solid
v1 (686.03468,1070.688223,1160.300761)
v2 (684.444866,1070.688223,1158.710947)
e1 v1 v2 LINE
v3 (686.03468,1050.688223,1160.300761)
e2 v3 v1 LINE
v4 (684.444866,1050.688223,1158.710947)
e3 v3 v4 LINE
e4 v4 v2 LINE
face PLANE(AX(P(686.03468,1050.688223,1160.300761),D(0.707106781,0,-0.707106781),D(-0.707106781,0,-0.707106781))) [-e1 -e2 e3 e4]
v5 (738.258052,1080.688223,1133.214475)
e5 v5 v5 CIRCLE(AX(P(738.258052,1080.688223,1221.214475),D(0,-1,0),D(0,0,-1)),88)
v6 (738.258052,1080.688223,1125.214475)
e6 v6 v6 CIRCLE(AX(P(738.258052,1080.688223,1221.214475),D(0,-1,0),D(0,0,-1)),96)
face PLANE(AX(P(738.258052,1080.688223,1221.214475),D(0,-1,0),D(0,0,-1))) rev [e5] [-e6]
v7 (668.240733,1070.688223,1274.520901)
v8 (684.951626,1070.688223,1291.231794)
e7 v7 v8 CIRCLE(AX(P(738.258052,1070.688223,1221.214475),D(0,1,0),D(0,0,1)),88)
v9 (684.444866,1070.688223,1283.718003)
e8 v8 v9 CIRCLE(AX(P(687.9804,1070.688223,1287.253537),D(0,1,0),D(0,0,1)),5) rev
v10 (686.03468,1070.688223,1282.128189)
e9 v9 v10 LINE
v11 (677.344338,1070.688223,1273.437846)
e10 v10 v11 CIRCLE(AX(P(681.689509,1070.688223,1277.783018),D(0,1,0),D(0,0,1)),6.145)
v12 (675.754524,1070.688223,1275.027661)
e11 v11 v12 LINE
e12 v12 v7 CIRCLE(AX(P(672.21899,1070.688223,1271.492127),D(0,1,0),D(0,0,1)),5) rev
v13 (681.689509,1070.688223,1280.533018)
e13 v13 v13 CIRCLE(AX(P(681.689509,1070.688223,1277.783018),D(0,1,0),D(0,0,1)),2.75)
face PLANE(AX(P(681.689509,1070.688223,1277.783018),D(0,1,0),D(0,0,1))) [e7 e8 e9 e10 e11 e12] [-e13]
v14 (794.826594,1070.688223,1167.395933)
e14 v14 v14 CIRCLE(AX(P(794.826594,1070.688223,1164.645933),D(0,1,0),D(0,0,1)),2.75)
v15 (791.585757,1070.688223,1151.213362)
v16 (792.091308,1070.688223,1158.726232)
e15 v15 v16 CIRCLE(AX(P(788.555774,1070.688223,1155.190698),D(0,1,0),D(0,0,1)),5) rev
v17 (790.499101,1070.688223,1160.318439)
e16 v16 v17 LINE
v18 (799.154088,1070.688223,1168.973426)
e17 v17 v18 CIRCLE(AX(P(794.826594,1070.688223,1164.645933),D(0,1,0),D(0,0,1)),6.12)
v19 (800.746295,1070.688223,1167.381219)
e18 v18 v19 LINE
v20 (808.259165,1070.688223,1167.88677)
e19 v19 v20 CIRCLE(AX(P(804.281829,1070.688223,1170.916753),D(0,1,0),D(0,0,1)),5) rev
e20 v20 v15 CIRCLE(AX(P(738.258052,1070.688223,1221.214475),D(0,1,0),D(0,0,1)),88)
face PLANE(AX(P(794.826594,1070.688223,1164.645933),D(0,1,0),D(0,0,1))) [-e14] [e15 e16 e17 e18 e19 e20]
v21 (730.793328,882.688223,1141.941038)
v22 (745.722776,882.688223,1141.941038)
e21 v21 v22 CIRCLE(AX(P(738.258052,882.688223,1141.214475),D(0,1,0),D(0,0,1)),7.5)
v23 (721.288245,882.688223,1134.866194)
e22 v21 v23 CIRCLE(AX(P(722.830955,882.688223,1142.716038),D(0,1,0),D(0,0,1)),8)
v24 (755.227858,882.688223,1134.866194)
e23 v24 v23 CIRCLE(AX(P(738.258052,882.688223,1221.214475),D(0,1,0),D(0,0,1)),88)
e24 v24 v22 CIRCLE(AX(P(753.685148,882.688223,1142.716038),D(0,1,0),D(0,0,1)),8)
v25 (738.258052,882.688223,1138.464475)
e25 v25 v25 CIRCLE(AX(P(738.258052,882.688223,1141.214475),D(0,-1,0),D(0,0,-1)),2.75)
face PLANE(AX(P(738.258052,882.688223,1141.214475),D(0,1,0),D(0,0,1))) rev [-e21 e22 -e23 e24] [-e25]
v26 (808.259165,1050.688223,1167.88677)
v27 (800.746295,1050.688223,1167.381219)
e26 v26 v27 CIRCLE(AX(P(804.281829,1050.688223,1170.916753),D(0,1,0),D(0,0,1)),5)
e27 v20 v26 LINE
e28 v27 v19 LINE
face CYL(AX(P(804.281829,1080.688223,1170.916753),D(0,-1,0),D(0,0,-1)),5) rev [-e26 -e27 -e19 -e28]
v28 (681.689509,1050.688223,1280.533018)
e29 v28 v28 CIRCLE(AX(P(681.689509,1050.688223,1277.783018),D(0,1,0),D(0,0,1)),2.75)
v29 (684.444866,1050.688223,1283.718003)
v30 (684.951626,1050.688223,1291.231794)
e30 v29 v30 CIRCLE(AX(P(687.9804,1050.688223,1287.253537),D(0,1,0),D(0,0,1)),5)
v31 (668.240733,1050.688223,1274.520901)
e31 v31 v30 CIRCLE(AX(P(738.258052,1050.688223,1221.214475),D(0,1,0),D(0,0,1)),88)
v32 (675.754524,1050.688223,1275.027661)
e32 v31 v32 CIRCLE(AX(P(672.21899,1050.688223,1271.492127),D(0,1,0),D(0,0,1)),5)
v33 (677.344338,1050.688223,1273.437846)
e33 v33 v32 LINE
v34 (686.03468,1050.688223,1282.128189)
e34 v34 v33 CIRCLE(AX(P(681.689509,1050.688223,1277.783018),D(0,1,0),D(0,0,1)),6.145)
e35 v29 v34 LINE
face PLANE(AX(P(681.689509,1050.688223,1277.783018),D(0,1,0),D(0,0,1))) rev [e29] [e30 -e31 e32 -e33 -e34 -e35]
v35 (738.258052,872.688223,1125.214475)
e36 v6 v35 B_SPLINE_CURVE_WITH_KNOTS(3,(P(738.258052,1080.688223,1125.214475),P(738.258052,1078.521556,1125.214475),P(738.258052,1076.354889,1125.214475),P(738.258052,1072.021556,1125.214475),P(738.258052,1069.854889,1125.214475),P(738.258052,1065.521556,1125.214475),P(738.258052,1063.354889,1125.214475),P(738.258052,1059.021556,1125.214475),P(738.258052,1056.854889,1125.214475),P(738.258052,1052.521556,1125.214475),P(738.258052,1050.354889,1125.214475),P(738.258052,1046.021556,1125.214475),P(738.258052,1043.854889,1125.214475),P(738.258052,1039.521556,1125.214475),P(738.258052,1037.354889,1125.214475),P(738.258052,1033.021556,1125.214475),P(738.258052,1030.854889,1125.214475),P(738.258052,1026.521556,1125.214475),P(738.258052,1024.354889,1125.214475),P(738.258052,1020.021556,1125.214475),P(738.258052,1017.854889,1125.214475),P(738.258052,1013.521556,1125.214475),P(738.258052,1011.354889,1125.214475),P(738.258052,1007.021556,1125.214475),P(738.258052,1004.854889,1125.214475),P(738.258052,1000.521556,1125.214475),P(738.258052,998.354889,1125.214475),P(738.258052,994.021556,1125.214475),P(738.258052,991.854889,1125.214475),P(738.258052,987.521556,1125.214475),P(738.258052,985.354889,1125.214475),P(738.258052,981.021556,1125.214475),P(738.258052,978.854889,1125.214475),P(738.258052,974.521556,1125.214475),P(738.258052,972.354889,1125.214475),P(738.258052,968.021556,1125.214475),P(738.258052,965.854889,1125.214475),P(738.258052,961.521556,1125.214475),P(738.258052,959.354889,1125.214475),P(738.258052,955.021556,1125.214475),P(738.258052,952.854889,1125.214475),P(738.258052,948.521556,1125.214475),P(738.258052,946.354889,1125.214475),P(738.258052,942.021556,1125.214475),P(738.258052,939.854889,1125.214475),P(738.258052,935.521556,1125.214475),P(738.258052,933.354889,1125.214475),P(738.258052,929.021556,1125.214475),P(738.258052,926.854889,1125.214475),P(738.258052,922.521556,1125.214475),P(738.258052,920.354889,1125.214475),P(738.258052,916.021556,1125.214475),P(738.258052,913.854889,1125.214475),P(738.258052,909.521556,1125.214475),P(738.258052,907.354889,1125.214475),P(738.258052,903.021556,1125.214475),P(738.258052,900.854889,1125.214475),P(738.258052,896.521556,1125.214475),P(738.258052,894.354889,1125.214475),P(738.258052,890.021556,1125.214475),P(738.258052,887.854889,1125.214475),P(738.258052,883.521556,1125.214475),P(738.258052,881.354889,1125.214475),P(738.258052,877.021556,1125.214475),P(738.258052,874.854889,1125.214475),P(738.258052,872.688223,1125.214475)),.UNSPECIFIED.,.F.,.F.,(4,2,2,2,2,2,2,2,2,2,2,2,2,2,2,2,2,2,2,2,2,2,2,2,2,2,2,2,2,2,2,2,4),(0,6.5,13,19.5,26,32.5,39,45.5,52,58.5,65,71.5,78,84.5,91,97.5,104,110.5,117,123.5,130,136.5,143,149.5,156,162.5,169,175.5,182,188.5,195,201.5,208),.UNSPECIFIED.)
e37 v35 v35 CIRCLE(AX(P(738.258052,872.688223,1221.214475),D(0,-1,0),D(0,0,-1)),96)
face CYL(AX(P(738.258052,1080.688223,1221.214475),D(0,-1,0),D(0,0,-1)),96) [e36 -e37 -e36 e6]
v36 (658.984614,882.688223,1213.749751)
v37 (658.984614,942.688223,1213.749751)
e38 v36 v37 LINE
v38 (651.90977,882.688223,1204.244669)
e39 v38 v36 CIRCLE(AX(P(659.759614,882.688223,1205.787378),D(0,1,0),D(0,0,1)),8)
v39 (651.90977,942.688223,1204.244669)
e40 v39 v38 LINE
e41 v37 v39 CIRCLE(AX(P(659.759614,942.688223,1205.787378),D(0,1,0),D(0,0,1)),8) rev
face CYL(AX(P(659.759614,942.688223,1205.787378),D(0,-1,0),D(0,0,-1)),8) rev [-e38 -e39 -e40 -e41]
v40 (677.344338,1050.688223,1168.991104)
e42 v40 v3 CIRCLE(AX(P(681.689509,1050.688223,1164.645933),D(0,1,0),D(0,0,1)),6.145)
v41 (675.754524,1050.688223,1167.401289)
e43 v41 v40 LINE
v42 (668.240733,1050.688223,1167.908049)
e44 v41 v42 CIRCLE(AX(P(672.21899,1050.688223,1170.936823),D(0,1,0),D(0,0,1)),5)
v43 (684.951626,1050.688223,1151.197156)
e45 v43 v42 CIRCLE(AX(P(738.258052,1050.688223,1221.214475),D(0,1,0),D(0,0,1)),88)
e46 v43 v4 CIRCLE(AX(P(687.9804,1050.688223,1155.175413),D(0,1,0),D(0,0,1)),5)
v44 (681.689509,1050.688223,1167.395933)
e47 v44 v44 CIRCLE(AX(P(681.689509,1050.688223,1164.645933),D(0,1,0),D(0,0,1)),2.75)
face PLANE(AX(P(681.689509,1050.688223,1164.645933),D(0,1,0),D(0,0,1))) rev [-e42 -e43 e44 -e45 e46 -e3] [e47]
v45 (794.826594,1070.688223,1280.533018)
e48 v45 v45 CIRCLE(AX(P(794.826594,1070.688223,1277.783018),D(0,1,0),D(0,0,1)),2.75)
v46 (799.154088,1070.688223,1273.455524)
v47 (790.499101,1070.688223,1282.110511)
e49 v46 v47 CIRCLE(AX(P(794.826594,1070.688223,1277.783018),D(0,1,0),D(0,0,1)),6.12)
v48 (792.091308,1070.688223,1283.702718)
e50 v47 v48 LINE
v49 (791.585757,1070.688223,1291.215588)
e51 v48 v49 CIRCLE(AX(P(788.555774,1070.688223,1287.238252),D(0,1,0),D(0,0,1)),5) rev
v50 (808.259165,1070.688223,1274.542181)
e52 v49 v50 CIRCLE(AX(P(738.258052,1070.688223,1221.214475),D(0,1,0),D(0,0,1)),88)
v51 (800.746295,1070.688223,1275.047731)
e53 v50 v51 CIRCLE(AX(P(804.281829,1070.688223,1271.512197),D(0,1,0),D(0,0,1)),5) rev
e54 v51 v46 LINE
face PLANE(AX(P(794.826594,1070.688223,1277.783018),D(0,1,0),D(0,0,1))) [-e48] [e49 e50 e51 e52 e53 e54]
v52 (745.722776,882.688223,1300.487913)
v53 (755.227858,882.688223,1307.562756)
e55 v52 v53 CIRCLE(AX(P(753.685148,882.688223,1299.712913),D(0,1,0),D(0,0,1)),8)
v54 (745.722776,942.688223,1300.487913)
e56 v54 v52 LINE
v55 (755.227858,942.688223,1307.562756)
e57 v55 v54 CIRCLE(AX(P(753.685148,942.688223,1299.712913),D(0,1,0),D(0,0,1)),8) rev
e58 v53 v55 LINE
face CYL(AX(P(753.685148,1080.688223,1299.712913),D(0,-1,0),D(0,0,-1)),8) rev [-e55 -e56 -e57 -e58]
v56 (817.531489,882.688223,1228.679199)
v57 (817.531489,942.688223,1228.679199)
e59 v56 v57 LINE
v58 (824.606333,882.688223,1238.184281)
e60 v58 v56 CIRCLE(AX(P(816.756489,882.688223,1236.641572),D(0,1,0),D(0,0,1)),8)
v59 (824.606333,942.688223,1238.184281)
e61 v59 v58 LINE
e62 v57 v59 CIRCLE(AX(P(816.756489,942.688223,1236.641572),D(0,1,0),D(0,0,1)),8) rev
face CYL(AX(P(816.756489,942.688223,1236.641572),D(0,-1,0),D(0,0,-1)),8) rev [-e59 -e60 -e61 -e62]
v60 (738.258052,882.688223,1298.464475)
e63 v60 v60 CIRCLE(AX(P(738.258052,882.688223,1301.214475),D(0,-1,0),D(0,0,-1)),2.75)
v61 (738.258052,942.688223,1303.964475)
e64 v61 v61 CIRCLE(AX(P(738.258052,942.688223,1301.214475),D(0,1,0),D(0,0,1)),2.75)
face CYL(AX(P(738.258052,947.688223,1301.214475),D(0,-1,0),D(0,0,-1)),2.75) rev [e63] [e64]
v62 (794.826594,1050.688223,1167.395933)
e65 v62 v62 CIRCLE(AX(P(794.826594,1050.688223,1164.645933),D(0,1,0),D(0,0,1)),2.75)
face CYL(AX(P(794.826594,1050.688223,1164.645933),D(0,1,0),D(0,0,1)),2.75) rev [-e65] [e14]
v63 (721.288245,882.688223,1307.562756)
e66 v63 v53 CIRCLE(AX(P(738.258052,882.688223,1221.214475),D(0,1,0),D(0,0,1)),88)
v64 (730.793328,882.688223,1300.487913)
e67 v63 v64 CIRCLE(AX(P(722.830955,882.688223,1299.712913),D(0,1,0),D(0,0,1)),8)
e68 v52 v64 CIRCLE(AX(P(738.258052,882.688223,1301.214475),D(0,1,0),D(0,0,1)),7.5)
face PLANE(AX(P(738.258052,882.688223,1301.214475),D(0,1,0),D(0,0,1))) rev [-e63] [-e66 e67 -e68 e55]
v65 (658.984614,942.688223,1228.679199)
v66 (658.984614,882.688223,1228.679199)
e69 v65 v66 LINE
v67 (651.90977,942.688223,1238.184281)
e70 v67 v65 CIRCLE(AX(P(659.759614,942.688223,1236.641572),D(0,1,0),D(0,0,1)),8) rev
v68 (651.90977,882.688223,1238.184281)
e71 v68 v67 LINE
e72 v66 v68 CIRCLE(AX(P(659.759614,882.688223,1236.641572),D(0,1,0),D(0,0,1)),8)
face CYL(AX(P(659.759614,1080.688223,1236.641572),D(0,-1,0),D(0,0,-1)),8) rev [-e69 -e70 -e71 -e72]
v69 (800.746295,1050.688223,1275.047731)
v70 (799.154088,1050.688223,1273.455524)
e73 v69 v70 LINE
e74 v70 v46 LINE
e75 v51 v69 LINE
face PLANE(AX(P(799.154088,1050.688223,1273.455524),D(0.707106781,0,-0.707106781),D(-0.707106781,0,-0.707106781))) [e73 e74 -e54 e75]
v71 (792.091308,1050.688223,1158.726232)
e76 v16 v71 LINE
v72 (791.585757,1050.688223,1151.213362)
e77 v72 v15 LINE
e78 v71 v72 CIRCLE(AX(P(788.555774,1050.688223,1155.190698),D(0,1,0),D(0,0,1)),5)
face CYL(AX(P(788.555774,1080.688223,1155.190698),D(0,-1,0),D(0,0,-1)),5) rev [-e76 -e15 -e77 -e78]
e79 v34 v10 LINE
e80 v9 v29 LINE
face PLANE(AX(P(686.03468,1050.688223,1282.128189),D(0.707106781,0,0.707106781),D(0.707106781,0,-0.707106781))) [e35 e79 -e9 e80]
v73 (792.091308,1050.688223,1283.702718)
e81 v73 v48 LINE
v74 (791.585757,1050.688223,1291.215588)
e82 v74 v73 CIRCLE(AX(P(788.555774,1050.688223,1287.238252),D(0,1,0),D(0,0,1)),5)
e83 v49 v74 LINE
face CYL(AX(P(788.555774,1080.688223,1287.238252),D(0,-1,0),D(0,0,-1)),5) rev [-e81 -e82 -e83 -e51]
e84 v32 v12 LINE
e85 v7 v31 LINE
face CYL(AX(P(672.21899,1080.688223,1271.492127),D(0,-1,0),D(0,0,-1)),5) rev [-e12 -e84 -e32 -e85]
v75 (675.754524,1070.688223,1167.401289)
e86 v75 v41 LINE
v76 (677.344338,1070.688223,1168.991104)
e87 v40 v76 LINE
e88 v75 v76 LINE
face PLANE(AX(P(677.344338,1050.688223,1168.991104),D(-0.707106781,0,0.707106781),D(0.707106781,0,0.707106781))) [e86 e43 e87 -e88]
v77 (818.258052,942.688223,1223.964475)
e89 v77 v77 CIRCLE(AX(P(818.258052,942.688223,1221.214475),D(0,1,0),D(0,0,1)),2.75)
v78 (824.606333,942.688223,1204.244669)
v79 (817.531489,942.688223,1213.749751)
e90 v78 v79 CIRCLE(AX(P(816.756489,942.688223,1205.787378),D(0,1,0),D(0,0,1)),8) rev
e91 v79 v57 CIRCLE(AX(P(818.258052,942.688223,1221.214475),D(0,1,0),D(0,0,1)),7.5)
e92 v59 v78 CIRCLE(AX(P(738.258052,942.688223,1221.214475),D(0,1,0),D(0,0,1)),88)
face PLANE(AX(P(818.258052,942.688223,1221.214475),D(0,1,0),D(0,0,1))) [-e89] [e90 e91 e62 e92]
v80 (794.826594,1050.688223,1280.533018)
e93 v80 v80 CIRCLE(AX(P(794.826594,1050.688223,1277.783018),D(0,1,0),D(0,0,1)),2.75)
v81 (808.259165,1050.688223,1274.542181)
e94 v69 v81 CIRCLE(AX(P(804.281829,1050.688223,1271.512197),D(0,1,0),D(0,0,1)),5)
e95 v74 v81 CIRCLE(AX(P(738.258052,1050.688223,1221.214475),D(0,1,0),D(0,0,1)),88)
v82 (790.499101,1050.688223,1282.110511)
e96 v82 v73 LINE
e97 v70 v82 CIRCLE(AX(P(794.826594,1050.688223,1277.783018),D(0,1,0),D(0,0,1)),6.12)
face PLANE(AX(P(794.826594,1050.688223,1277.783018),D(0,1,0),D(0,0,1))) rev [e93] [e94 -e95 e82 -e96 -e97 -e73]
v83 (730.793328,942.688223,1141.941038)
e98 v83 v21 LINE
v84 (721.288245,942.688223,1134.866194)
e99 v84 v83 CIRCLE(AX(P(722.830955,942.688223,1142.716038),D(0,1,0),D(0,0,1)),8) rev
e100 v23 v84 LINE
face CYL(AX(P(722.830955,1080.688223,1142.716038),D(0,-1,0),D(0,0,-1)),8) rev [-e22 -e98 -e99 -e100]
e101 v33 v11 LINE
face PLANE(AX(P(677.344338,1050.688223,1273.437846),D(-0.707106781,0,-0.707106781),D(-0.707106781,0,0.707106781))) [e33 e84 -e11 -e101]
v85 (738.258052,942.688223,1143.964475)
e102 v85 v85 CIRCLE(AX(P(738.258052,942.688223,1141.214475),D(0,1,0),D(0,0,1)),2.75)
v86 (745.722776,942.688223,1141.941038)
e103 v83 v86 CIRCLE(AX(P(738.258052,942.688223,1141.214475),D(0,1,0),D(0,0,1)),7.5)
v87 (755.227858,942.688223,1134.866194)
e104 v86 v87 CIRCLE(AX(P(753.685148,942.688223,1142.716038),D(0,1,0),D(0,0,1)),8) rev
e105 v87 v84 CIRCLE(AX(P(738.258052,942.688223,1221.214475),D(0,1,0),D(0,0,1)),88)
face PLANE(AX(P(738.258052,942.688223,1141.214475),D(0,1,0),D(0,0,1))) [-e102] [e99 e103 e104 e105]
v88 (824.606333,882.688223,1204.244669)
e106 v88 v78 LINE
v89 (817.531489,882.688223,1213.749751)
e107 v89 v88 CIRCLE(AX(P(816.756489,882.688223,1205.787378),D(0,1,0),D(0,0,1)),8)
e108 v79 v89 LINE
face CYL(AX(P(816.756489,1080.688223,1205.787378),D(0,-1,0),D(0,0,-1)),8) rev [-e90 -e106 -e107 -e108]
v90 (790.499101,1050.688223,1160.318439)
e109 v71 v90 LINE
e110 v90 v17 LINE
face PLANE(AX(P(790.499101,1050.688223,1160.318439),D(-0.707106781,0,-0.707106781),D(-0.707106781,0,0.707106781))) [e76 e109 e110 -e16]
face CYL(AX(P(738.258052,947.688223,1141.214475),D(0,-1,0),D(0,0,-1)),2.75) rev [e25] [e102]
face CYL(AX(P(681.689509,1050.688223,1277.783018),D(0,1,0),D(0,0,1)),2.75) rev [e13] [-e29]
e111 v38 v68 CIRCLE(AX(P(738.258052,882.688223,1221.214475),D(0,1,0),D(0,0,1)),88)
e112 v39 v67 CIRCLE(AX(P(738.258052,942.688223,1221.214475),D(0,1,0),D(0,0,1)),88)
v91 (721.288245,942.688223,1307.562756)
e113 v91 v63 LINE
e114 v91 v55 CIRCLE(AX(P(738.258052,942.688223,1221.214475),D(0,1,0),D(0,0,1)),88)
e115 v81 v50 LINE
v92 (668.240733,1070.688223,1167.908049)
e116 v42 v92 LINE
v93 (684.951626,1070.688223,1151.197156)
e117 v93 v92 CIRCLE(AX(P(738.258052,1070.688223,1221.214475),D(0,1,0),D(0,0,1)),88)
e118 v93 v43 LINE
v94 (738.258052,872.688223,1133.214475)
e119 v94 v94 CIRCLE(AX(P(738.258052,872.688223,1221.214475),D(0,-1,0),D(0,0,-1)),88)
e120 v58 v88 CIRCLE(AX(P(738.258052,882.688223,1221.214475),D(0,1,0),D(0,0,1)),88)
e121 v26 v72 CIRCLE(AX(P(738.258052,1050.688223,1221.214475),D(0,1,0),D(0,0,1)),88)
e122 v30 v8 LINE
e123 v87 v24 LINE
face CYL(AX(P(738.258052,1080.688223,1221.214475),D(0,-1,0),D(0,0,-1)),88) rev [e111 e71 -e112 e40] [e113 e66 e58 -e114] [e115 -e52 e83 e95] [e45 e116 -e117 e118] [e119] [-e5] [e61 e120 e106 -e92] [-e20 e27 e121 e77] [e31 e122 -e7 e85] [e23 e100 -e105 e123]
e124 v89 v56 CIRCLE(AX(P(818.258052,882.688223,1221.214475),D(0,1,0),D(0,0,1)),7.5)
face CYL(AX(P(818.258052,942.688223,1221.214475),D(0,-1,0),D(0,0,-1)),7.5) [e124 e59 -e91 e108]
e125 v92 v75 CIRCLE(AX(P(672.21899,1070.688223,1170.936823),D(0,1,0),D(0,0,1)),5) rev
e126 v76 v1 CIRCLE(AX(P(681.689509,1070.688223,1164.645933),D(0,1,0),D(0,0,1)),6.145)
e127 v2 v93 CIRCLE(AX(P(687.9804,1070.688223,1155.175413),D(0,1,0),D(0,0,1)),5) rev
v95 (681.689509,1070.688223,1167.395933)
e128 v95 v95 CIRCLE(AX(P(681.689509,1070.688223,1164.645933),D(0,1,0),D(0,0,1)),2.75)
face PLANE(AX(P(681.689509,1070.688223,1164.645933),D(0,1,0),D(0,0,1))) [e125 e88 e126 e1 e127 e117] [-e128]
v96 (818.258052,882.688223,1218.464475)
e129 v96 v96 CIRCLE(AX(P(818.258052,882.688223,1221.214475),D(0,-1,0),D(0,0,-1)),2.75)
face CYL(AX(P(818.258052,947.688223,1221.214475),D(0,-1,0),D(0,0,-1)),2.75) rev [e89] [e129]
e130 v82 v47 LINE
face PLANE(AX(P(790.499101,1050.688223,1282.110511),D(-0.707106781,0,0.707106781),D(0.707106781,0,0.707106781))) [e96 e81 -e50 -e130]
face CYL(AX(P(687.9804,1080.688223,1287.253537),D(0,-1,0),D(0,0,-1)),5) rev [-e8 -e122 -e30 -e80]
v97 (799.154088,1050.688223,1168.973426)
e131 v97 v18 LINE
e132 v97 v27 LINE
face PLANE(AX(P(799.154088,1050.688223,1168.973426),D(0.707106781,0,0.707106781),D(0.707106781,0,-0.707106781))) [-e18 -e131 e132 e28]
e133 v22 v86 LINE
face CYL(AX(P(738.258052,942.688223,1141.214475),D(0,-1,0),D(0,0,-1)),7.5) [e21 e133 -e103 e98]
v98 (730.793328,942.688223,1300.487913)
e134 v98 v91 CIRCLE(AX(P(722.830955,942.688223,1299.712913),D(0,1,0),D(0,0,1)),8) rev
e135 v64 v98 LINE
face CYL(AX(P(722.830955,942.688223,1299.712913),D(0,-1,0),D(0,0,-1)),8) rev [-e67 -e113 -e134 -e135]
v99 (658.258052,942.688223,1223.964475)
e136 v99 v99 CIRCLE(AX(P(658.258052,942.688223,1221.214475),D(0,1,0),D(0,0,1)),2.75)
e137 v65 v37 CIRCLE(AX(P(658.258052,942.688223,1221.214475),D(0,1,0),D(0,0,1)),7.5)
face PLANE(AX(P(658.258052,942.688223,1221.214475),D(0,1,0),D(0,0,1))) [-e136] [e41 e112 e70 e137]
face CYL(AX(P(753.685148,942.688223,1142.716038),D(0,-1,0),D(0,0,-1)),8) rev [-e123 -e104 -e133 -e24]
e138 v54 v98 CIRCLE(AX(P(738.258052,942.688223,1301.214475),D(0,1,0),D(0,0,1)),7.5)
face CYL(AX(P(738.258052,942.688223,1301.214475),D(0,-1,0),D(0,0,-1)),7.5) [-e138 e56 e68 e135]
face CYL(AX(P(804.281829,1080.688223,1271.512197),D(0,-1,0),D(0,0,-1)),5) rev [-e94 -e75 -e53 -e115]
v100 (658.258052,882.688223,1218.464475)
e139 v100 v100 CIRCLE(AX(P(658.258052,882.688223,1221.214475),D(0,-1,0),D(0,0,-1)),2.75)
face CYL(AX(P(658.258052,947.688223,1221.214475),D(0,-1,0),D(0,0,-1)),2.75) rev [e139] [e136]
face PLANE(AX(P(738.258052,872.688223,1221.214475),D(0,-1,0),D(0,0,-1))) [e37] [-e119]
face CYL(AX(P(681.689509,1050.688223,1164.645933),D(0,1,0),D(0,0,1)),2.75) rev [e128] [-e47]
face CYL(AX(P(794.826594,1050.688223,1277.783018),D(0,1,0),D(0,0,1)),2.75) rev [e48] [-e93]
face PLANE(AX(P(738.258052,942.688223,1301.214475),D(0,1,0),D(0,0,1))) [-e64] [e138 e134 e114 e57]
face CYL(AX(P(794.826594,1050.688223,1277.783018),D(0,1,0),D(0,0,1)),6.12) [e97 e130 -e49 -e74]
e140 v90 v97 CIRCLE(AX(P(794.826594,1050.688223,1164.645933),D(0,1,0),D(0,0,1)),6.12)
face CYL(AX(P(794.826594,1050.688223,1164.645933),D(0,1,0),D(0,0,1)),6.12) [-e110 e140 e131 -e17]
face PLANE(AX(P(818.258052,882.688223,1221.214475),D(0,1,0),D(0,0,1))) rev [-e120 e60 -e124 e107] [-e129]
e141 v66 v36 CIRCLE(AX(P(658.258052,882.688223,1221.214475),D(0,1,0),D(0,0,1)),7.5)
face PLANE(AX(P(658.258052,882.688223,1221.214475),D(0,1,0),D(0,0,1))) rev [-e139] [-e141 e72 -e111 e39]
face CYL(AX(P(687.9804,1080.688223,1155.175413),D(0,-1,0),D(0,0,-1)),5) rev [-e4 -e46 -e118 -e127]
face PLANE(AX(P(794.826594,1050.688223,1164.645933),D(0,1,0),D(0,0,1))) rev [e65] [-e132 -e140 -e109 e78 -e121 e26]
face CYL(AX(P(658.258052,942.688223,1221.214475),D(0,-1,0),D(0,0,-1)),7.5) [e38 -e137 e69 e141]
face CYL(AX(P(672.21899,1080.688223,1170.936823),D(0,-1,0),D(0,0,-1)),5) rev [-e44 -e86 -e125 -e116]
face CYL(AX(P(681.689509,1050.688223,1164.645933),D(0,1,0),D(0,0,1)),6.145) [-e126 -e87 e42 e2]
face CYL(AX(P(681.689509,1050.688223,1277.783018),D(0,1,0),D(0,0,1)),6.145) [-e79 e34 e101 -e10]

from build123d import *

# Parameters (mm, degrees)
SKETCH1_R             = 96
SKETCH1_R_2           = 88
BOSS_EXTRUDE3_DEPTH   = 208
BOSS_EXTRUDE4_DEPTH   = 60
BOSS_EXTRUDE4_2_DEPTH = 60
BOSS_EXTRUDE4_3_DEPTH = 60
BOSS_EXTRUDE4_4_DEPTH = 60
FILLET1_R             = 8
SKETCH3_R             = 2.75
CUT_EXTRUDE1_DEPTH    = 65
SKETCH5_R             = 2.75
BOSS_EXTRUDE5_DEPTH   = 20
FILLET3_R             = 5


with BuildPart() as part:
    # Sketch1 → Boss-Extrude3 (new body)
    with BuildSketch(Plane.XZ.offset(-872.688222755)):
        with Locations(Location((738.258051733, 1221.214475077, 0), (0, 0, 270))):
            Circle(SKETCH1_R)
        with Locations(Location((738.258051733, 1221.214475077, 0), (0, 0, 270))):
            Circle(SKETCH1_R_2, mode=Mode.SUBTRACT)
    extrude(amount=-BOSS_EXTRUDE3_DEPTH)


with BuildPart() as body_2:
    # Sketch2 → Boss-Extrude4 (new body)
    with BuildSketch(Plane(origin=(0, 882.688222755, 0), x_dir=(1, 0, 0), z_dir=(0, 1, 0))):
        with BuildLine():
            Line((658.258051733, -1213.714475077), (650.578236496, -1213.714475077))
            ThreePointArc((650.578236496, -1213.714475077), (650.258051733, -1221.214475077), (650.578236496, -1228.714475077))
            Line((650.578236496, -1228.714475077), (658.258051733, -1228.714475077))
            ThreePointArc((658.258051733, -1228.714475077), (665.758051733, -1221.214475077), (658.258051733, -1213.714475077))
        make_face()
    extrude(amount=BOSS_EXTRUDE4_DEPTH)


with BuildPart() as body_3:
    # Sketch2 → Boss-Extrude4 2 (new body)
    with BuildSketch(Plane(origin=(0, 882.688222755, 0), x_dir=(1, 0, 0), z_dir=(0, 1, 0))):
        with BuildLine():
            Line((730.758051733, -1301.214475077), (730.758051733, -1308.894290314))
            ThreePointArc((730.758051733, -1308.894290314), (738.258051733, -1309.214475077), (745.758051733, -1308.894290314))
            Line((745.758051733, -1308.894290314), (745.758051733, -1301.214475077))
            ThreePointArc((745.758051733, -1301.214475077), (738.258051733, -1293.714475077), (730.758051733, -1301.214475077))
        make_face()
    extrude(amount=BOSS_EXTRUDE4_2_DEPTH)


with BuildPart() as body_4:
    # Sketch2 → Boss-Extrude4 3 (new body)
    with BuildSketch(Plane(origin=(0, 882.688222755, 0), x_dir=(1, 0, 0), z_dir=(0, 1, 0))):
        with BuildLine():
            Line((818.258051733, -1228.714475077), (825.93786697, -1228.714475077))
            ThreePointArc((825.93786697, -1228.714475077), (826.258051733, -1221.214475077), (825.93786697, -1213.714475077))
            Line((825.93786697, -1213.714475077), (818.258051733, -1213.714475077))
            ThreePointArc((818.258051733, -1213.714475077), (810.758051733, -1221.214475077), (818.258051733, -1228.714475077))
        make_face()
    extrude(amount=BOSS_EXTRUDE4_3_DEPTH)


with BuildPart() as body_5:
    # Sketch2 → Boss-Extrude4 4 (new body)
    with BuildSketch(Plane(origin=(0, 882.688222755, 0), x_dir=(1, 0, 0), z_dir=(0, 1, 0))):
        with BuildLine():
            Line((730.758051733, -1141.214475077), (730.758051733, -1133.53465984))
            ThreePointArc((730.758051733, -1133.53465984), (738.258051733, -1133.214475077), (745.758051733, -1133.53465984))
            Line((745.758051733, -1133.53465984), (745.758051733, -1141.214475077))
            ThreePointArc((745.758051733, -1141.214475077), (738.258051733, -1148.714475077), (730.758051733, -1141.214475077))
        make_face()
    extrude(amount=BOSS_EXTRUDE4_4_DEPTH)

    # Combine1: union body 4, body 3, body 2, part
    add(body_4.part)
    add(body_3.part)
    add(body_2.part)
    add(part.part)

    # Fillet1
    # the kernel refuses this fillet: 8 mm, written as the material it adds along each edge
    with BuildSketch(Plane(origin=(745.758051733, 882.688222755, 1308.894290314), x_dir=(0.9902588501618923, 0, -0.13923867880745916), z_dir=(0, 1, 0)), Plane(origin=(650.578236496, 882.688222755, 1228.714475077), x_dir=(0.13923867880745078, 0, 0.9902588501618935), z_dir=(0, 1, 0)), Plane(origin=(825.93786697, 882.688222755, 1213.714475077), x_dir=(-0.13923867880746754, 0, -0.9902588501618913), z_dir=(0, 1, 0))) as fillet1_piece_1:
        with BuildLine():
            CenterArc((9.128280488, 7.988182101), FILLET1_R, 177.555452969, 95.559247246)
            Line((1.135560727, 8.329401712), (0.336288751, 8.363523673))
            ThreePointArc((0.336288751, 8.363523673), (0.277120247, 7.716395949), (-0.79220708, 0.111390943))
            Line((-0.79220708, 0.111390943), (-0.043468002, -0.79881821))
            ThreePointArc((-0.043468002, -0.79881821), (4.781480255, -0.92999689), (9.606428513, -0.79881821))
            Line((9.606428513, -0.79881821), (9.562960511, 0))
        make_face()
    extrude(amount=60)
    with BuildSketch(Plane(origin=(730.758051733, 882.688222755, 1308.894290314), x_dir=(-0.9902588501618917, 0, -0.1392386788074641), z_dir=(0, 1, 0)), Plane(origin=(650.578236496, 882.688222755, 1213.714475077), x_dir=(0.1392386788074475, 0, -0.990258850161894), z_dir=(0, 1, 0)), Plane(origin=(825.93786697, 882.688222755, 1228.714475077), x_dir=(-0.13923867880745916, 0, 0.9902588501618923), z_dir=(0, 1, 0))) as fillet1_piece_2:
        with BuildLine():
            CenterArc((9.128280488, -7.988182101), FILLET1_R, 86.885299786, 95.559247246)
            Line((1.135560727, -8.329401712), (0.336288751, -8.363523673))
            ThreePointArc((0.336288751, -8.363523673), (0.277120247, -7.716395949), (-0.79220708, -0.111390943))
            Line((-0.79220708, -0.111390943), (-0.043468002, 0.79881821))
            ThreePointArc((-0.043468002, 0.79881821), (4.781480255, 0.92999689), (9.606428513, 0.79881821))
            Line((9.606428513, 0.79881821), (9.562960511, 0))
        make_face()
    extrude(amount=60)
    with BuildSketch(Plane(origin=(745.758051733, 882.688222755, 1133.53465984), x_dir=(-0.004196280557394128, 0, 0.9999911955759828), z_dir=(0, 1, 0))) as fillet1_piece_3:
        with BuildLine():
            CenterArc((9.148032579, 7.965554461), FILLET1_R, 169.12193538, 95.559247246)
            Line((1.2917843, 9.475310394), (0.506159472, 9.626285987))
            ThreePointArc((0.506159472, 9.626285987), (-0.275580776, 4.863281082), (-0.797368322, 0.064836408))
            Line((-0.797368322, 0.064836408), (0.003357024, -0.799992956))
            ThreePointArc((0.003357024, -0.799992956), (7.683104645, -0.767766297), (8.332293668, -0.796555446))
            Line((8.332293668, -0.796555446), (8.406451751, 0))
        make_face()
    extrude(amount=60)
    with BuildSketch(Plane(origin=(730.758051733, 882.688222755, 1133.53465984), x_dir=(0.0041962805574076514, 0, 0.9999911955759828), z_dir=(0, 1, 0))) as fillet1_piece_4:
        with BuildLine():
            CenterArc((9.148032579, -7.965554461), FILLET1_R, 95.318817375, 95.559247246)
            Line((1.2917843, -9.475310394), (0.506159472, -9.626285987))
            ThreePointArc((0.506159472, -9.626285987), (-0.275580776, -4.863281082), (-0.797368322, -0.064836408))
            Line((-0.797368322, -0.064836408), (0.003357024, 0.799992956))
            ThreePointArc((0.003357024, 0.799992956), (7.683104645, 0.767766297), (8.332293668, 0.796555446))
            Line((8.332293668, 0.796555446), (8.406451751, 0))
        make_face()
    extrude(amount=60)

    # Sketch3 → Cut-Extrude1 (cut)
    with BuildSketch(Plane.XZ.offset(-882.688222755)):
        with Locations(Location((738.258051733, 1141.214475077, 0), (0, 0, 270))):
            Circle(SKETCH3_R)
        with Locations(Location((818.258051733, 1221.214475077, 0), (0, 0, 270))):
            Circle(SKETCH3_R)
        with Locations(Location((738.258051733, 1301.214475077, 0), (0, 0, 270))):
            Circle(SKETCH3_R)
        with Locations(Location((658.258051733, 1221.214475077, 0), (0, 0, 270))):
            Circle(SKETCH3_R)
    extrude(amount=-CUT_EXTRUDE1_DEPTH, mode=Mode.SUBTRACT)

    # Sketch5 → Boss-Extrude5 (add)
    # profile 1 of 4: a face of its own
    with BuildSketch(Plane(origin=(0, 1070.688222755, 0), x_dir=(1, 0, 0), z_dir=(0, 1, 0))):
        with BuildLine():
            Line((677.344338067, -1168.991103752), (671.839379876, -1163.486145561))
            ThreePointArc((671.839379876, -1163.486145561), (676.032654988, -1158.989078333), (680.529722217, -1154.79580322))
            Line((680.529722217, -1154.79580322), (686.034680408, -1160.300761412))
            ThreePointArc((686.034680408, -1160.300761412), (686.034680408, -1168.991103752), (677.344338067, -1168.991103752))
        make_face()
        with Locations(Location((681.689509238, -1164.645932582, 0), (0, 0, 270))):
            Circle(SKETCH5_R, mode=Mode.SUBTRACT)
    # profile 2 of 4: a face of its own
    with BuildSketch(Plane(origin=(0, 1070.688222755, 0), x_dir=(1, 0, 0), z_dir=(0, 1, 0))):
        with BuildLine():
            Line((677.344338068, -1273.437846402), (671.839379876, -1278.942804593))
            ThreePointArc((671.839379876, -1278.942804593), (676.032654988, -1283.439871821), (680.529722217, -1287.633146934))
            Line((680.529722217, -1287.633146934), (686.034680408, -1282.128188742))
            ThreePointArc((686.034680408, -1282.128188742), (686.034680408, -1273.437846402), (677.344338068, -1273.437846402))
        make_face()
        with Locations(Location((681.689509238, -1277.783017572, 0), (0, 0, 270))):
            Circle(SKETCH5_R, mode=Mode.SUBTRACT)
    # profile 3 of 4: a face of its own
    with BuildSketch(Plane(origin=(0, 1070.688222755, 0), x_dir=(1, 0, 0), z_dir=(0, 1, 0))):
        with BuildLine():
            Line((790.499100727, -1282.110511073), (796.005293833, -1287.616704179))
            ThreePointArc((796.005293833, -1287.616704179), (800.483448477, -1283.439871821), (804.660280835, -1278.961717178))
            Line((804.660280835, -1278.961717178), (799.154087729, -1273.455524071))
            ThreePointArc((799.154087729, -1273.455524071), (790.499100727, -1273.455524071), (790.499100727, -1282.110511073))
        make_face()
        with Locations(Location((794.826594228, -1277.783017572, 0), (0, 0, 270))):
            Circle(SKETCH5_R, mode=Mode.SUBTRACT)
    # profile 4 of 4: a face of its own
    with BuildSketch(Plane(origin=(0, 1070.688222755, 0), x_dir=(1, 0, 0), z_dir=(0, 1, 0))):
        with BuildLine():
            Line((790.499100727, -1160.318439081), (796.005293833, -1154.812245975))
            ThreePointArc((796.005293833, -1154.812245975), (800.483448477, -1158.989078333), (804.660280835, -1163.467232976))
            Line((804.660280835, -1163.467232976), (799.154087729, -1168.973426083))
            ThreePointArc((799.154087729, -1168.973426083), (790.499100727, -1168.973426083), (790.499100727, -1160.318439081))
        make_face()
        with Locations(Location((794.826594228, -1164.645932582, 0), (0, 0, 270))):
            Circle(SKETCH5_R, mode=Mode.SUBTRACT)
    extrude(amount=-BOSS_EXTRUDE5_DEPTH)

    # Fillet3
    fillet3_edges = [body_5.edges().sort_by_distance(p)[0] for p in [
        (671.839379876, 1060.688222755, 1163.486145561),
        (680.529722217, 1060.688222755, 1154.79580322),
        (680.529722217, 1060.688222755, 1287.633146934),
        (671.839379876, 1060.688222755, 1278.942804593),
        (804.660280835, 1060.688222755, 1278.961717178),
        (796.005293833, 1060.688222755, 1287.616704179),
        (796.005293833, 1060.688222755, 1154.812245975),
        (804.660280835, 1060.688222755, 1163.467232976),
    ]]
    fillet(fillet3_edges, radius=FILLET3_R)


solid = body_5.part
